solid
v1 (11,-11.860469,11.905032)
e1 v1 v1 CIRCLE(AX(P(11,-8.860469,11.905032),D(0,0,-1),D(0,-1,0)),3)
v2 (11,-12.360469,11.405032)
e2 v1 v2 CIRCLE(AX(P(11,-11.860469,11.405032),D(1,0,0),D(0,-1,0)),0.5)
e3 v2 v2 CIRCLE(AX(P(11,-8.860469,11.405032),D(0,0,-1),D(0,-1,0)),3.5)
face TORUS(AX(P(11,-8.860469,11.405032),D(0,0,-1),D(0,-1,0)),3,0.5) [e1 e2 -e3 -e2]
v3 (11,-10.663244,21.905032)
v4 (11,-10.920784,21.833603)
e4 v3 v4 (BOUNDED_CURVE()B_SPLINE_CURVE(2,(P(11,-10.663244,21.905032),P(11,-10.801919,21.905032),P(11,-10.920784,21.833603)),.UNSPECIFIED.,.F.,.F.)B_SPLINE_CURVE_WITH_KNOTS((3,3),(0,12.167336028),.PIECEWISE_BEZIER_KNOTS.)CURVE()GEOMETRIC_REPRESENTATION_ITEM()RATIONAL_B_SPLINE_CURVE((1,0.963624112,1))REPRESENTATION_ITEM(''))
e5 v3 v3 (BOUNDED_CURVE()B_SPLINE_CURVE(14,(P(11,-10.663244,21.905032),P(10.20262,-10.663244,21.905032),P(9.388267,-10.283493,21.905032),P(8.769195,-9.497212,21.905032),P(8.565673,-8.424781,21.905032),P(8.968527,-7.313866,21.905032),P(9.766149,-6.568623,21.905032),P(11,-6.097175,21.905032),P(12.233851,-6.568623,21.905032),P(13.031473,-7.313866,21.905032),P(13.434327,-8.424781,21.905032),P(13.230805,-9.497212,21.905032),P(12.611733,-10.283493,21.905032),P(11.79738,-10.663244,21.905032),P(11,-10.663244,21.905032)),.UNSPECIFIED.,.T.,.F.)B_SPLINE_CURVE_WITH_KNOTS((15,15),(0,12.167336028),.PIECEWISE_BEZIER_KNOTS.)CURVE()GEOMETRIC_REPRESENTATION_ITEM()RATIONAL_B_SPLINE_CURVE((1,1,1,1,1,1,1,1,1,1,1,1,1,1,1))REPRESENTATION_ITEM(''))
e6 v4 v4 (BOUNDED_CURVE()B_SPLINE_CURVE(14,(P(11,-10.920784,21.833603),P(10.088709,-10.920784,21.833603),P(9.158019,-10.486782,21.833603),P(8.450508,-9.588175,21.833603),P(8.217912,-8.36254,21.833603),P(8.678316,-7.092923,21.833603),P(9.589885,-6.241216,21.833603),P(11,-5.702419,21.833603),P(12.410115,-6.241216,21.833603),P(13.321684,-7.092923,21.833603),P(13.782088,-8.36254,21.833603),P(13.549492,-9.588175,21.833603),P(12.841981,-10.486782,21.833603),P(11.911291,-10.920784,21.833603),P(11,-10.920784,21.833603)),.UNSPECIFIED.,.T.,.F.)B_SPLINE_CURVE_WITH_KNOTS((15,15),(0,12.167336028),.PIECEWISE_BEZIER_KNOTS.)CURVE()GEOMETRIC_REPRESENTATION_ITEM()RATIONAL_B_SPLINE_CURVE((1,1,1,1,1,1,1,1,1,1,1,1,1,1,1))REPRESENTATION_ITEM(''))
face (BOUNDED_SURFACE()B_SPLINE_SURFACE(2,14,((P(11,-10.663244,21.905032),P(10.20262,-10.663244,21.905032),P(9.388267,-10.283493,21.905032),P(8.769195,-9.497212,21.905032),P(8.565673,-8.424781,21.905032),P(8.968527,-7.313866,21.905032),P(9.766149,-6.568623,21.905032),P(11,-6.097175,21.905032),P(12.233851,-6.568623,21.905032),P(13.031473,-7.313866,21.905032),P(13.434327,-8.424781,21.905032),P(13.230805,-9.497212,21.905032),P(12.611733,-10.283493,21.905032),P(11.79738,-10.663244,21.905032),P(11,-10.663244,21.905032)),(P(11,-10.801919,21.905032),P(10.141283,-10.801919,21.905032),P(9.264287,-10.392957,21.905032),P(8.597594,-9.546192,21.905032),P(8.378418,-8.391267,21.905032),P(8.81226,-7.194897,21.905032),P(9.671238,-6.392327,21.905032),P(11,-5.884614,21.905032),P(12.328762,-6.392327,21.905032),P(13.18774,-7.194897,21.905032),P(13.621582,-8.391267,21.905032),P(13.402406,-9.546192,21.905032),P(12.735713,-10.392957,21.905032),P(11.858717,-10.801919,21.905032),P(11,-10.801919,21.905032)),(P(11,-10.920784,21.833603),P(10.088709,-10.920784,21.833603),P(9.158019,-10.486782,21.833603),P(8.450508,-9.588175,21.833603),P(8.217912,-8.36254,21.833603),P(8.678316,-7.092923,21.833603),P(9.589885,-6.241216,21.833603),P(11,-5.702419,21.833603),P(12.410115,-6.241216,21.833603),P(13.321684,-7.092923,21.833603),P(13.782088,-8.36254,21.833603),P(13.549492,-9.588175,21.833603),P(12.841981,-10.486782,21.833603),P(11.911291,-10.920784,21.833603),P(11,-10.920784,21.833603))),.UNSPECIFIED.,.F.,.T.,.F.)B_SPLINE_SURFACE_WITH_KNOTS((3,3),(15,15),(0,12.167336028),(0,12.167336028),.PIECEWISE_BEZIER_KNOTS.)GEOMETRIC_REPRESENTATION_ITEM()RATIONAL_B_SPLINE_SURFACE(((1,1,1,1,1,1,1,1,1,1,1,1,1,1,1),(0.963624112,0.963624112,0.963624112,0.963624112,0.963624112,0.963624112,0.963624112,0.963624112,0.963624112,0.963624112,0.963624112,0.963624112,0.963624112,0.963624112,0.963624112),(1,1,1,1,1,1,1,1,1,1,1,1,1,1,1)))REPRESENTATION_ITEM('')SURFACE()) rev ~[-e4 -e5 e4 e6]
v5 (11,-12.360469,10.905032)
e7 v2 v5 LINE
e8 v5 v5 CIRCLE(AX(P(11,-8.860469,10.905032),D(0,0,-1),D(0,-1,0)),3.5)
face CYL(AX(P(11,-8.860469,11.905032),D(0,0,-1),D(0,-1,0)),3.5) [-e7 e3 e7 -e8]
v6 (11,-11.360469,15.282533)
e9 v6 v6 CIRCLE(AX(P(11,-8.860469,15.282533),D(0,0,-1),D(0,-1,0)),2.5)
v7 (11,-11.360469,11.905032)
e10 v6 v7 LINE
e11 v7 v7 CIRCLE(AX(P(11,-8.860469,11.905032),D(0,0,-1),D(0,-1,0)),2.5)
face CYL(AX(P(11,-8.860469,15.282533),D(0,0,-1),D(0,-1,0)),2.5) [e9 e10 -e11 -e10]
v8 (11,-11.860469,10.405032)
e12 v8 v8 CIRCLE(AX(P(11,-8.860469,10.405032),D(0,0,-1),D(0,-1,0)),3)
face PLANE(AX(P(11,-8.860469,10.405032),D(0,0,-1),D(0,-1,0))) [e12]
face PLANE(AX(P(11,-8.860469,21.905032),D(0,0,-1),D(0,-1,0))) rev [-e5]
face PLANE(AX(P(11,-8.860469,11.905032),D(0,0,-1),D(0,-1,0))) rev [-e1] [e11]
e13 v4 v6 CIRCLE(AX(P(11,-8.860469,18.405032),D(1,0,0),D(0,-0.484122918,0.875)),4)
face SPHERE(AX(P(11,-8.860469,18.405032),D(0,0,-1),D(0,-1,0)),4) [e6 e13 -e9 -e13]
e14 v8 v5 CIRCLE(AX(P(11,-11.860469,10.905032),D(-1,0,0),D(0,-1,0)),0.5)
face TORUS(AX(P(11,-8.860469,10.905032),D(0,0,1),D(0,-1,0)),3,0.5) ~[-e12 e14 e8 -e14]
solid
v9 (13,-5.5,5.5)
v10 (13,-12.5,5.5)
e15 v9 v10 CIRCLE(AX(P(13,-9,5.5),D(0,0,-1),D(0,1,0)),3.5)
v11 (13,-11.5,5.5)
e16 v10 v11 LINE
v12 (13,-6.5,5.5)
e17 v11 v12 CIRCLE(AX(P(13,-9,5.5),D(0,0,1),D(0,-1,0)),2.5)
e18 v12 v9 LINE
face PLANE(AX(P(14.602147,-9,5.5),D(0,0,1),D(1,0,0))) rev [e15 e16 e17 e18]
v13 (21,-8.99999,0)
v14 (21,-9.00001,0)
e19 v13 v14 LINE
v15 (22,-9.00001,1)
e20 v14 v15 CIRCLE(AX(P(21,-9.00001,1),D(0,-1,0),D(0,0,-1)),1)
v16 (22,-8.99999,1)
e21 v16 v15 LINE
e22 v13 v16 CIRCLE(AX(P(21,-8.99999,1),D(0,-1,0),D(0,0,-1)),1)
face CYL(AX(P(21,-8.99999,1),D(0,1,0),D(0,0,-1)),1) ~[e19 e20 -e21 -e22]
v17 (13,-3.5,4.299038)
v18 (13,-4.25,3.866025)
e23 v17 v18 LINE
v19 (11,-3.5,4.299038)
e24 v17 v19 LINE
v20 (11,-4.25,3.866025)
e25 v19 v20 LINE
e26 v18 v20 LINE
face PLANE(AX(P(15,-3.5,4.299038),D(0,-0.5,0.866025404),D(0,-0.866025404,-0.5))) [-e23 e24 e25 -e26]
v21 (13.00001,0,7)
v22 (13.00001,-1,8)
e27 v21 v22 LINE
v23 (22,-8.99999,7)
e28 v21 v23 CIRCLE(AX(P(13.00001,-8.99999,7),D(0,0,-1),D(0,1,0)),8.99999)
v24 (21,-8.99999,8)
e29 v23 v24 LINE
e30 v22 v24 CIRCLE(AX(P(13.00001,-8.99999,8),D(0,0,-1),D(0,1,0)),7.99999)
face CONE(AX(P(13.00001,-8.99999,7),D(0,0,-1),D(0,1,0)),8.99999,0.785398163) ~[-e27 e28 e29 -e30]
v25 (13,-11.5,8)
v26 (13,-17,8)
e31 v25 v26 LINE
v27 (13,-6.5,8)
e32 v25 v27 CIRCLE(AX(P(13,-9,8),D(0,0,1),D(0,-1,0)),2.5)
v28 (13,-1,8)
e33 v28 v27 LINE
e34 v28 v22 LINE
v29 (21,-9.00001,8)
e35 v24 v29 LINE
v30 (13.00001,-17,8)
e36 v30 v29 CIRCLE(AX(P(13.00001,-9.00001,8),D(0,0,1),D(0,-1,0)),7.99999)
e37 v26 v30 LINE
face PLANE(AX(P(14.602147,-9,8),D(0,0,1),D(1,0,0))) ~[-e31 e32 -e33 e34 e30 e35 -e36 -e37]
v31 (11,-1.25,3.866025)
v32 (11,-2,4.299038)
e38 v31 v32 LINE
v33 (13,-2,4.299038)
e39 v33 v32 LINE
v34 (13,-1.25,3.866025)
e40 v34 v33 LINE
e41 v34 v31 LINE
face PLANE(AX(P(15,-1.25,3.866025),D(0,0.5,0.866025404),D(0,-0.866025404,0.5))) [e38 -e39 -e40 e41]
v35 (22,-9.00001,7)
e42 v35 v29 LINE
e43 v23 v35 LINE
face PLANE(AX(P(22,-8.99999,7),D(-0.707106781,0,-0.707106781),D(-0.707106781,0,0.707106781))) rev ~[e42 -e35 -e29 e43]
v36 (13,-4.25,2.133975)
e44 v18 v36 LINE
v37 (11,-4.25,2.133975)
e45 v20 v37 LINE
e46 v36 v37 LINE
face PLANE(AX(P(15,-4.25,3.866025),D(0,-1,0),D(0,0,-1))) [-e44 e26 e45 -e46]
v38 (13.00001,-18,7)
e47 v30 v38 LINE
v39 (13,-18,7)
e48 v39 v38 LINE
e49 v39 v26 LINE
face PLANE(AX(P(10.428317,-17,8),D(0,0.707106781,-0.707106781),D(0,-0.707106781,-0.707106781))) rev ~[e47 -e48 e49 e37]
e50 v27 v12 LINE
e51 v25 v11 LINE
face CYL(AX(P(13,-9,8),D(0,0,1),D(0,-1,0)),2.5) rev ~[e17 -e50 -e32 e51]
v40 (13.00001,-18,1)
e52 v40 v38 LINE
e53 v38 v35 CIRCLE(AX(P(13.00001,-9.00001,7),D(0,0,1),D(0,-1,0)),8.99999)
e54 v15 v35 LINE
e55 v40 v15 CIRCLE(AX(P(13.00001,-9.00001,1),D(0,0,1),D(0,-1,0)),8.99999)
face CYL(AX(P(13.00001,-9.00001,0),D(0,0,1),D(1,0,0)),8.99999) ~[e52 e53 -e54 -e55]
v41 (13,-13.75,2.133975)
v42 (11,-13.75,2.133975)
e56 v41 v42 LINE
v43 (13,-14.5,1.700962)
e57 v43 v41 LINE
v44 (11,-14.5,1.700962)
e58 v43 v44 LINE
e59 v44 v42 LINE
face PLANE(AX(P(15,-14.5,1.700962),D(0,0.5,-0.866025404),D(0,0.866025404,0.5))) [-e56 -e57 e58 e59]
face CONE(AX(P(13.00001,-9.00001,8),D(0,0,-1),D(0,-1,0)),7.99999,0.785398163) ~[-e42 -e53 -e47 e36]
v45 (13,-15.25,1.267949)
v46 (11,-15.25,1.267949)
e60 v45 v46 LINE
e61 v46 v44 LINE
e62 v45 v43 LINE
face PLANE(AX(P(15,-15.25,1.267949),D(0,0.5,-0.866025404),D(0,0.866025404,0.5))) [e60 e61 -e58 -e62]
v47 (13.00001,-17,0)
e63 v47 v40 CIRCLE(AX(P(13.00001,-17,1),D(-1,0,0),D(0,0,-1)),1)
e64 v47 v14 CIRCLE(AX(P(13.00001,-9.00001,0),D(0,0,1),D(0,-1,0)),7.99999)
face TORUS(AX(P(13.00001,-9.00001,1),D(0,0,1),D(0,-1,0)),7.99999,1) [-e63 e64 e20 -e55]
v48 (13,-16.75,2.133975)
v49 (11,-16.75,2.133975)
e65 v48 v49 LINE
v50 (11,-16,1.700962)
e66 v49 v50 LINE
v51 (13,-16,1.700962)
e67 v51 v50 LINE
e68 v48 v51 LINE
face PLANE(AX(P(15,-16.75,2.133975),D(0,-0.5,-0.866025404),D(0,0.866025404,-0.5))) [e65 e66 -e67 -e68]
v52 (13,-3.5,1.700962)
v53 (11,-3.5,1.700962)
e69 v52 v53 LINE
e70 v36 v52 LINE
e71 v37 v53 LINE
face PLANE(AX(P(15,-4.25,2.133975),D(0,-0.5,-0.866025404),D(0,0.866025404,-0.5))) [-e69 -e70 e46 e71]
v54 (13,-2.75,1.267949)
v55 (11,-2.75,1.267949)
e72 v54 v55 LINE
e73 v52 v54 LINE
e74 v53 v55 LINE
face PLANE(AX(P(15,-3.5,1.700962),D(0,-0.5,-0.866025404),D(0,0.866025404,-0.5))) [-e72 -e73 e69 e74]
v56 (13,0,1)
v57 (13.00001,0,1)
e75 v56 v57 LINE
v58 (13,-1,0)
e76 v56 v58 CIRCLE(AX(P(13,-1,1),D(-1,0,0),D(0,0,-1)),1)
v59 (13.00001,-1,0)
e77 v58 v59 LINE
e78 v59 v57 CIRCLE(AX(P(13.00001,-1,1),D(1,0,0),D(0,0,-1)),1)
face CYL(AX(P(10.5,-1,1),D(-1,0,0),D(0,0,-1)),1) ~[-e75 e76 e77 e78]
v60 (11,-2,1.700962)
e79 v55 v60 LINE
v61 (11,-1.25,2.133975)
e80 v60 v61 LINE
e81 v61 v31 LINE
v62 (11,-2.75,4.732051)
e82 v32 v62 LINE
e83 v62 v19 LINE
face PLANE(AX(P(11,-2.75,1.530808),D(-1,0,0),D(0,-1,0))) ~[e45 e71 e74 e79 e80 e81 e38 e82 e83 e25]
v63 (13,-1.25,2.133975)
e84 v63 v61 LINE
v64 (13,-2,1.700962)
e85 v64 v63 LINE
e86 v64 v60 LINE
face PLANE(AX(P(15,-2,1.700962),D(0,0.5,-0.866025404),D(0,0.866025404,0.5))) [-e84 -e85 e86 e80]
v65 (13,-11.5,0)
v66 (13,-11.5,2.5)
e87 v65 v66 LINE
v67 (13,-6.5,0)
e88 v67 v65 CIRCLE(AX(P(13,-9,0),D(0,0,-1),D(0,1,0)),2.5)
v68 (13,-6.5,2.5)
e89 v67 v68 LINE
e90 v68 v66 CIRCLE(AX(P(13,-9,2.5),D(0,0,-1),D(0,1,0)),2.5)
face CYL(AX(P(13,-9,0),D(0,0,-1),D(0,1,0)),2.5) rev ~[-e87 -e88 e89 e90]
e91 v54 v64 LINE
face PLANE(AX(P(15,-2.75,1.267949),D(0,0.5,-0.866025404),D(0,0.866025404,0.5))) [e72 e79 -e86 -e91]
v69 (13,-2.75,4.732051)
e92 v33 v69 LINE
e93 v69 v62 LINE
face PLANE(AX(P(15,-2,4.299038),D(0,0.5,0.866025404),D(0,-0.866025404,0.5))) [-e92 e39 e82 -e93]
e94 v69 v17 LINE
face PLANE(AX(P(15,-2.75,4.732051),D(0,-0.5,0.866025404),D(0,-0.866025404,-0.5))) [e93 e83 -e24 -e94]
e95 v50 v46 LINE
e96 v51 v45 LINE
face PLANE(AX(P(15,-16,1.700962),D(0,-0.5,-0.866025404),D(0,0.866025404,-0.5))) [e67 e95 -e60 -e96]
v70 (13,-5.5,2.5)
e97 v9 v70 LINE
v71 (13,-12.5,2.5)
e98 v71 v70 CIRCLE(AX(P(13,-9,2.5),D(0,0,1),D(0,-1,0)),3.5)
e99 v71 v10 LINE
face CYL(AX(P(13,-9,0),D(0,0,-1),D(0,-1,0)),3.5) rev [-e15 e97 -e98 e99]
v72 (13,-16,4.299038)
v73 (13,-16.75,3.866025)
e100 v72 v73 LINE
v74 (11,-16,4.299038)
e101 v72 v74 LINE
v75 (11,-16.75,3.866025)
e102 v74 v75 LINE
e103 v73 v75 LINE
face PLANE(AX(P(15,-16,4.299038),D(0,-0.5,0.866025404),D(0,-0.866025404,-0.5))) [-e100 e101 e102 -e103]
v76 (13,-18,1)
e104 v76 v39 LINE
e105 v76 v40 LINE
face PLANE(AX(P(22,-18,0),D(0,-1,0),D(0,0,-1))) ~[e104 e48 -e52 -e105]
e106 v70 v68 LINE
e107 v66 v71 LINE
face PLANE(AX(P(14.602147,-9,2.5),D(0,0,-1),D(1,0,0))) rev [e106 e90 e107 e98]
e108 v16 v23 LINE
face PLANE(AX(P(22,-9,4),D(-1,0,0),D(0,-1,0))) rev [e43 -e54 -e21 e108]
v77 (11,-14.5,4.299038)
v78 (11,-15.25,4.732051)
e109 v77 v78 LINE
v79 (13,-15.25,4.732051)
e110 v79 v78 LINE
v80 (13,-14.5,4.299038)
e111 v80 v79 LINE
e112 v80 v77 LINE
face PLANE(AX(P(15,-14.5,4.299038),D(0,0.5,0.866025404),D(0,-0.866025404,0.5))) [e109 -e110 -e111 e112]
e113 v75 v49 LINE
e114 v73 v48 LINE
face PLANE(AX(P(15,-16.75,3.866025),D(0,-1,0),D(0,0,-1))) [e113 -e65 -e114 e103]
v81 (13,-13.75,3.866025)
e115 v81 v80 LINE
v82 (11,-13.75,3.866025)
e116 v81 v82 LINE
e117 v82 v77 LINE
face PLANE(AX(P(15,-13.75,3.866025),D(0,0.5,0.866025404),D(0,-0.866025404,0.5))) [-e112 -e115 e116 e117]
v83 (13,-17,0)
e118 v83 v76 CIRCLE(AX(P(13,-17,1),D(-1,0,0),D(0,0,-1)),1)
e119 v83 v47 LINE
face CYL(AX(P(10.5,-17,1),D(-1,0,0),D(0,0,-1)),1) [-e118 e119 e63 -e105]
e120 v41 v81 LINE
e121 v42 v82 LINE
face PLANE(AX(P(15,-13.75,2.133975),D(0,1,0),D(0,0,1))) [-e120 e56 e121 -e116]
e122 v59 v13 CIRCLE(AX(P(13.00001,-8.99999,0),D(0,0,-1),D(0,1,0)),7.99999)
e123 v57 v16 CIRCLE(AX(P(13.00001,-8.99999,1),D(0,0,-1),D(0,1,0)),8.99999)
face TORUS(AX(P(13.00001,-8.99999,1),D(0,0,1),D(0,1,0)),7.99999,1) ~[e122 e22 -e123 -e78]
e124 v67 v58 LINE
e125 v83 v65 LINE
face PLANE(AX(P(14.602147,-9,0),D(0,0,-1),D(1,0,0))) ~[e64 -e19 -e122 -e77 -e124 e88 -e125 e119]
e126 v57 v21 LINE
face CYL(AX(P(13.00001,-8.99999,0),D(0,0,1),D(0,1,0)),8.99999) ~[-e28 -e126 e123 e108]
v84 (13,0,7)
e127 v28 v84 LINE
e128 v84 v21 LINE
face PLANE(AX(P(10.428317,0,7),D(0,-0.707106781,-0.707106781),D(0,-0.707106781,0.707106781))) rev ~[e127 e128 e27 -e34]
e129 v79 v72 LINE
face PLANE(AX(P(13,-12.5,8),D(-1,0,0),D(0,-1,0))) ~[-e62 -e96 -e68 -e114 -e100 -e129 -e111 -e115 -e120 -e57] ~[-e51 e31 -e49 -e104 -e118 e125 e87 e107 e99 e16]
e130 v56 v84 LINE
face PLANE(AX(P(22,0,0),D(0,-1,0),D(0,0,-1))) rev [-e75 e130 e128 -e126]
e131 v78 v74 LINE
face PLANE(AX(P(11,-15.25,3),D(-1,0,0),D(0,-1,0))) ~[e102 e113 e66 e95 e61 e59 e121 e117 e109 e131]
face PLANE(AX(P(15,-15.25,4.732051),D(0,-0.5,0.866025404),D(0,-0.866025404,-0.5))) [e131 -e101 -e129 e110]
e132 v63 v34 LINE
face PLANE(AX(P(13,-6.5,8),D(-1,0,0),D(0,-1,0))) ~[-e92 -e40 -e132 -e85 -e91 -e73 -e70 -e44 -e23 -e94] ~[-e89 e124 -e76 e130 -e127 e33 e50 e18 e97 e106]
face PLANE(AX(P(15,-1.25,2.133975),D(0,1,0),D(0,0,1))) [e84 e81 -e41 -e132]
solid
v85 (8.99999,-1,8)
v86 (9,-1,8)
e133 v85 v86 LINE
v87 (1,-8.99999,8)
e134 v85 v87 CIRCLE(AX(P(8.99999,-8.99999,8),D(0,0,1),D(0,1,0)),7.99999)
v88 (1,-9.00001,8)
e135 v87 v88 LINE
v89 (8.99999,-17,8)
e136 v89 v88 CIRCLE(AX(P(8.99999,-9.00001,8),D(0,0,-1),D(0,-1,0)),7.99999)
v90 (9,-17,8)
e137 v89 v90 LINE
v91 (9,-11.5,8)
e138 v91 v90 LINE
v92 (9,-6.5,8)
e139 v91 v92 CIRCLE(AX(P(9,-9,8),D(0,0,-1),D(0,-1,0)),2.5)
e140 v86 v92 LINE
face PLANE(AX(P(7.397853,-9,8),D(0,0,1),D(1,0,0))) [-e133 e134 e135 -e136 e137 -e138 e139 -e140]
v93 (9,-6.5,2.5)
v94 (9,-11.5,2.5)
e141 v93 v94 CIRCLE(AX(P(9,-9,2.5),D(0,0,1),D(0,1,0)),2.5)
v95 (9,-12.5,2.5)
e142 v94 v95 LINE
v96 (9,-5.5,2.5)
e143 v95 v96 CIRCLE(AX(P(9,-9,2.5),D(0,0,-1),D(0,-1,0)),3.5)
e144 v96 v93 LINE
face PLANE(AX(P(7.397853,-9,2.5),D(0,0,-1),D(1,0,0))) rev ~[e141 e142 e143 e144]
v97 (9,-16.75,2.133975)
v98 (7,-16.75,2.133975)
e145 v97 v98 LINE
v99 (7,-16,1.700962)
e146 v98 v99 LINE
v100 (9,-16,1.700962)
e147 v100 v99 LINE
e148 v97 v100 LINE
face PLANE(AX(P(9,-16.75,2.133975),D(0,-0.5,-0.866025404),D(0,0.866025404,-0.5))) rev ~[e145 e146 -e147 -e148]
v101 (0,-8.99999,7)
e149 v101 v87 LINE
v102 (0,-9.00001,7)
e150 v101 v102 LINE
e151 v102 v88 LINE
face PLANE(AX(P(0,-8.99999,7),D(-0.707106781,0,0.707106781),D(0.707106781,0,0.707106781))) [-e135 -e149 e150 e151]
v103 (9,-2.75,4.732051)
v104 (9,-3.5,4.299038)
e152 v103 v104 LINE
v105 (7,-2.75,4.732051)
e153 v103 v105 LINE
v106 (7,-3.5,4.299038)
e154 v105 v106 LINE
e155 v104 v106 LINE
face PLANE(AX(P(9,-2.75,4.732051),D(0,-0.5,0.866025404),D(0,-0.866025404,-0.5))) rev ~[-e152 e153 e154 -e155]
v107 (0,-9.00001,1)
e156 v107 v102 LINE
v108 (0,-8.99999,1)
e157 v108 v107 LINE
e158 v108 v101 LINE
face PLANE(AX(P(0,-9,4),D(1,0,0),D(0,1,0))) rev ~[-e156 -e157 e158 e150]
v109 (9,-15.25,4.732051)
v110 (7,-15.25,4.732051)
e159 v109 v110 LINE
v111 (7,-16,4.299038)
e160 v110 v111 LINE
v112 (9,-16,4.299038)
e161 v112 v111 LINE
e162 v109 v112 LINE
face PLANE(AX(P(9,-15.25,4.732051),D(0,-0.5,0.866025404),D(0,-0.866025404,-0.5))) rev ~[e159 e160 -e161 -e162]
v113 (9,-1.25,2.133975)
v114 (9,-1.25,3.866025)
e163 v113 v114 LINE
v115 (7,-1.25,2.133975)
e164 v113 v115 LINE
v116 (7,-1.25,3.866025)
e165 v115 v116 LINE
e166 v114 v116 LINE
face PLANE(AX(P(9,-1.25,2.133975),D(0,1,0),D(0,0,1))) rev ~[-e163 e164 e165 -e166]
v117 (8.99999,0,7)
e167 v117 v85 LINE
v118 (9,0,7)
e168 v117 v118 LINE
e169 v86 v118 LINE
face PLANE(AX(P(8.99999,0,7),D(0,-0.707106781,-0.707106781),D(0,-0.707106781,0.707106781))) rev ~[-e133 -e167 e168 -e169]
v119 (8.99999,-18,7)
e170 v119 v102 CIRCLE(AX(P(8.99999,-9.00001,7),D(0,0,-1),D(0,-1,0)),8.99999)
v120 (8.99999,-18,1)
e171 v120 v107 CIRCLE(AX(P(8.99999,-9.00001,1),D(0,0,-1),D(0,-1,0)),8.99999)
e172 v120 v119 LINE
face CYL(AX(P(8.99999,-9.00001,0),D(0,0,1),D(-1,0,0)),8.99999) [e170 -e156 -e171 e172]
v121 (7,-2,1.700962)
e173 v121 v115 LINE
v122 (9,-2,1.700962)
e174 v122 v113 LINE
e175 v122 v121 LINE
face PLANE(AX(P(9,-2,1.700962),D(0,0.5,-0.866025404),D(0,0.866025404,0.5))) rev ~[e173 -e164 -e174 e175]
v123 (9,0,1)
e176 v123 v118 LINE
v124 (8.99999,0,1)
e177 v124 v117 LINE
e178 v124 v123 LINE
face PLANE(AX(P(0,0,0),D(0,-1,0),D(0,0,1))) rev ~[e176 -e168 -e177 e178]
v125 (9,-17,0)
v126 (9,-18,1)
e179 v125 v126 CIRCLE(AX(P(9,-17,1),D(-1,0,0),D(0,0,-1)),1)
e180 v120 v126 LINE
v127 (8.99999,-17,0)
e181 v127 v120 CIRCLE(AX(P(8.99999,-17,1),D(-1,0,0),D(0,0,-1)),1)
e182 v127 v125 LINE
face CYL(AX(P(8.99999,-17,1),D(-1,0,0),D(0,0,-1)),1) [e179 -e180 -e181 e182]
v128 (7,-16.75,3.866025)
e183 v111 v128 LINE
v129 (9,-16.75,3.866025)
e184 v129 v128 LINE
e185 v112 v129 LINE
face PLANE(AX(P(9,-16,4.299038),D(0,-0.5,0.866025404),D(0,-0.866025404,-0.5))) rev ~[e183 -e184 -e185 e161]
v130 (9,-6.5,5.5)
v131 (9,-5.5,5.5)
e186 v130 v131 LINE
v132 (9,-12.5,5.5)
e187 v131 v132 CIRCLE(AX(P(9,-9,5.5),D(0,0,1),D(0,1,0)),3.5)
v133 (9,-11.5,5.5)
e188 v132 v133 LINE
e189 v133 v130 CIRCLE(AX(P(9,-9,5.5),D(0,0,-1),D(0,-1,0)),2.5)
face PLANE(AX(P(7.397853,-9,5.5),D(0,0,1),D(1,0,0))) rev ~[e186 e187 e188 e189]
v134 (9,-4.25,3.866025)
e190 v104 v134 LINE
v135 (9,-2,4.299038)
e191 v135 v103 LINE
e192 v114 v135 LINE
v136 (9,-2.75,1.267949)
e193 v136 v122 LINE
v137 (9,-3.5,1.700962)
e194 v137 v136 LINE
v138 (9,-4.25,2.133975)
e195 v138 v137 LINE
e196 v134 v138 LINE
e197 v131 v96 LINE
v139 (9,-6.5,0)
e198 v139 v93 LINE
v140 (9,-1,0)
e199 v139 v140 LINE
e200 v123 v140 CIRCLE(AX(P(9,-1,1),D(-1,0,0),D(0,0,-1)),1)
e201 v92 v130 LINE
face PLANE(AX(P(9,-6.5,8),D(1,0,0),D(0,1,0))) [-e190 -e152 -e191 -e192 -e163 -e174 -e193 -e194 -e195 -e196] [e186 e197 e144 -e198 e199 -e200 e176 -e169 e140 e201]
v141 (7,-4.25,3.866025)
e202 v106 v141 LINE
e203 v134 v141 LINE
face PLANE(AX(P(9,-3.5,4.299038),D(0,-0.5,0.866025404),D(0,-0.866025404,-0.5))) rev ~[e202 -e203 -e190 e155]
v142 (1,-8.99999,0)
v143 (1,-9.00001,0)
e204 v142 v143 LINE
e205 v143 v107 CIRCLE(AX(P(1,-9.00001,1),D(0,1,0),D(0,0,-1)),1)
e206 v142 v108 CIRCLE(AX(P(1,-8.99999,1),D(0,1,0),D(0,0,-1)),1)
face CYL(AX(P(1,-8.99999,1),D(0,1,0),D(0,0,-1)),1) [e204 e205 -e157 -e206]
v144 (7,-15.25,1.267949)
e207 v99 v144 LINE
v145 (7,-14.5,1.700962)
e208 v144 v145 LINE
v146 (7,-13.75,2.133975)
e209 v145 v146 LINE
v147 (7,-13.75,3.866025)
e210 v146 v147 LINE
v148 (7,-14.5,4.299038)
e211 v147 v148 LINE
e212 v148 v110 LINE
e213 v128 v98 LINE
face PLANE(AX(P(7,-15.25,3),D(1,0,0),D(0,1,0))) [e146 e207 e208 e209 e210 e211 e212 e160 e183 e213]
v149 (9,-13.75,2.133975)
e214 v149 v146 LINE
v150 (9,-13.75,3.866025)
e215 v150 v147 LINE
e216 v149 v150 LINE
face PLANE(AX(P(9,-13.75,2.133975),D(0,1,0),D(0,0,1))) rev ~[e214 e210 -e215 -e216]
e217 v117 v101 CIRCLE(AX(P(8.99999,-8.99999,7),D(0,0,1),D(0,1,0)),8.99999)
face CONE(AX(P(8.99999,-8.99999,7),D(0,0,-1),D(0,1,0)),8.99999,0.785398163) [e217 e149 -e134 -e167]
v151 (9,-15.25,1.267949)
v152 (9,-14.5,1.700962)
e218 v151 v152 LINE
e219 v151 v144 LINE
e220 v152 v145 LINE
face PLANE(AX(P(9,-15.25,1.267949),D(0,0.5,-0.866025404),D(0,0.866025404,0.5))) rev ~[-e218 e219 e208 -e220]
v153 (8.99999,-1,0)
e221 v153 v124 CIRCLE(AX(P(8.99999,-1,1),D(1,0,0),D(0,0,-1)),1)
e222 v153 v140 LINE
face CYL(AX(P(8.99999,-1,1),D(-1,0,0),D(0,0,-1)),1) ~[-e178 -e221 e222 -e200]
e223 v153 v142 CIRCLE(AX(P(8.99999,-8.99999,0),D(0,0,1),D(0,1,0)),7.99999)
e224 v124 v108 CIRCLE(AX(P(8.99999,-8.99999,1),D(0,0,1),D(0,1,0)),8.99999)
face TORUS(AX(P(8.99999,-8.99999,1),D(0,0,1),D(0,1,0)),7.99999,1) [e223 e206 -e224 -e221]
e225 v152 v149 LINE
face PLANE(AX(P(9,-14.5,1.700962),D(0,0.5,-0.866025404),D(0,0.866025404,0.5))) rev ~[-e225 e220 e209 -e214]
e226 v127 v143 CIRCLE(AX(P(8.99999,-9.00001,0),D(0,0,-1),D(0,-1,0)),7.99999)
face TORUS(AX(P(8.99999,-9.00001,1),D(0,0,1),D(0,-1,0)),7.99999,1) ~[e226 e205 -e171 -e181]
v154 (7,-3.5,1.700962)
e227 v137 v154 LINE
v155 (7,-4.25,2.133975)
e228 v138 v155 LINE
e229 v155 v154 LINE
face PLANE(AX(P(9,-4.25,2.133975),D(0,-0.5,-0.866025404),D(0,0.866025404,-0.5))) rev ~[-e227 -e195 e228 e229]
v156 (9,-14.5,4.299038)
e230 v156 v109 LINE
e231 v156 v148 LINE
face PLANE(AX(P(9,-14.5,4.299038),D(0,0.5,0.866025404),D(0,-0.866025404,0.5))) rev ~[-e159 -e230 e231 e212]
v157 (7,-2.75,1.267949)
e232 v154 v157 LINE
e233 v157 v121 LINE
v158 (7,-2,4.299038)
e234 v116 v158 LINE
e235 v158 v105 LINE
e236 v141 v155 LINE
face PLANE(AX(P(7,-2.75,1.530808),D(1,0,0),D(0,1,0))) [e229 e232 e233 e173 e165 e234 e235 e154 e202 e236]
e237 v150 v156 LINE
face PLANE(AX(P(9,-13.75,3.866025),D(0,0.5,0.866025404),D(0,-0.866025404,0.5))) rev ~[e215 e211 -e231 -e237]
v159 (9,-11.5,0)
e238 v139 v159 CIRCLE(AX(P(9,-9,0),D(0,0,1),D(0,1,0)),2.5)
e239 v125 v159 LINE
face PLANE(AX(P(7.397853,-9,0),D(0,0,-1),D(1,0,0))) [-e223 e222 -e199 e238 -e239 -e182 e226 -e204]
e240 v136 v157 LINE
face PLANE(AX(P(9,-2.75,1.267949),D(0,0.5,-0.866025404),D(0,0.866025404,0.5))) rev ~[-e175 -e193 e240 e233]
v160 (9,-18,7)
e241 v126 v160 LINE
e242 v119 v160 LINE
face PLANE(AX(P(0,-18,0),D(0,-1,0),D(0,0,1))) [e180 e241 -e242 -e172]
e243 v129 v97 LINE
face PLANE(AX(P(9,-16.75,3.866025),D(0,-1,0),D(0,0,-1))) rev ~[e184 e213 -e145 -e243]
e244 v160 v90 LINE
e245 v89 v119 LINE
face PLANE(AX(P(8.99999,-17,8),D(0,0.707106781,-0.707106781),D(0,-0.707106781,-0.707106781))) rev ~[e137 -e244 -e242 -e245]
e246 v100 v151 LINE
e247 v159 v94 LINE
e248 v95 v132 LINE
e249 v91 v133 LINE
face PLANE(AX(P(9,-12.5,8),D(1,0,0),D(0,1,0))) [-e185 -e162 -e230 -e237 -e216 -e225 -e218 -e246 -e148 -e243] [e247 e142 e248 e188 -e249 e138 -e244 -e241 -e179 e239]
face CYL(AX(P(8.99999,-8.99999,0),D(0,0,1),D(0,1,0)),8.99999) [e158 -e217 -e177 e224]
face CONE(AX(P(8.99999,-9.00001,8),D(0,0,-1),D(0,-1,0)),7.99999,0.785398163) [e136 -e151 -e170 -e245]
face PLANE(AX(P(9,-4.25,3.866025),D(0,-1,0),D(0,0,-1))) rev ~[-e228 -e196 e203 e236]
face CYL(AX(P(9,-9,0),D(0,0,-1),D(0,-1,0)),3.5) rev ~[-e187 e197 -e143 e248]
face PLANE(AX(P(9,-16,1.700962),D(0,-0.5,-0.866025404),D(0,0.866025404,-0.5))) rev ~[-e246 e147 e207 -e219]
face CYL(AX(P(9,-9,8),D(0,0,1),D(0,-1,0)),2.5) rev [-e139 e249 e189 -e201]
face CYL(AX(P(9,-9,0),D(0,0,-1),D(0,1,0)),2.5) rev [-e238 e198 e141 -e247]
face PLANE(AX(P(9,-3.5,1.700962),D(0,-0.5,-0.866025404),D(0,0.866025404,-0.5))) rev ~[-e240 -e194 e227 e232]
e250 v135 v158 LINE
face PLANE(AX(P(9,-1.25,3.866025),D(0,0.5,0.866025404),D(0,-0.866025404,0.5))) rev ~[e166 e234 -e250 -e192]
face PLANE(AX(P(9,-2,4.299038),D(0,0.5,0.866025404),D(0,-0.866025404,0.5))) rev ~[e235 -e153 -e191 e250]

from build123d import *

# Parameters (mm, degrees)
F0_W           = 18
F0_H           = 8
F1_DEPTH       = 9
F3_DEPTH       = 4
F4_DEPTH       = 2.5
F6_R           = 8.99999
F8_DEPTH       = 2
F10_DEPTH      = 4
F11_DEPTH      = 2.5
F15_R          = 0.5
F17_DEPTH      = 4
F18_T1_DEPTH   = 2.50001
F18_T3_DEPTH   = 2e-05
F18_T6_ANGLE   = 90
F18_T8_ANGLE   = 90
F18_2_T1_DEPTH = 2.50001
F18_2_T3_DEPTH = 2e-05
F18_2_T6_ANGLE = 90
F18_2_T8_ANGLE = 90
F19_T1_DEPTH   = 2.571692988
F19_T3_DEPTH   = 2e-05
F19_T6_ANGLE   = 90
F19_T8_ANGLE   = 90
F19_2_T1_DEPTH = 2.571692988
F19_2_T3_DEPTH = 2e-05
F19_2_T6_ANGLE = 90
F19_2_T8_ANGLE = 90


# Not quite as in the source:
# - a fillet or chamfer that OpenCascade refuses, or shapes differently, is made with other operations: its cross-section is extruded or revolved along the edge and cut away or added
# - a fillet or chamfer is up to 0.001 mm smaller than in the source, because OpenCascade refuses the exact size


with BuildPart() as f1:
    # F0 (on Right) → F1 (new body)
    with BuildSketch(Plane.YZ):
        with Locations((-9, 4)):
            Rectangle(F0_W, F0_H)
    extrude(amount=F1_DEPTH)

    # F2 (on face) → F3 (cut)
    with BuildSketch(Plane(origin=(0, 0, 0), x_dir=(1, 0, 0), z_dir=(0, 0, -1))):
        with BuildLine():
            Line((9, 6.5), (9, 11.5))
            ThreePointArc((9, 11.5), (6.5, 9), (9, 6.5))
        make_face()
        with BuildLine():
            ThreePointArc((9, 6.5), (6.5, 9), (9, 11.5))
            Line((9, 11.5), (9, 12.5))
            ThreePointArc((9, 12.5), (5.5, 9), (9, 5.5))
            Line((9, 5.5), (9, 6.5))
        make_face()
    extrude(amount=-F3_DEPTH, mode=Mode.SUBTRACT)

    # F2 (on face) → F4 (join)
    with BuildSketch(Plane(origin=(0, 0, 0), x_dir=(1, 0, 0), z_dir=(0, 0, -1))):
        with BuildLine():
            ThreePointArc((9, 6.5), (6.5, 9), (9, 11.5))
            Line((9, 11.5), (9, 12.5))
            ThreePointArc((9, 12.5), (5.5, 9), (9, 5.5))
            Line((9, 5.5), (9, 6.5))
        make_face()
    extrude(amount=-F4_DEPTH)

    # F6 (radius 9 in the source; OpenCascade refuses exactly that, so slightly less here)
    f6_edges = [f1.edges().sort_by_distance(p)[0] for p in [
        (0, -18, 4),
        (0, 0, 4),
    ]]
    fillet(f6_edges, radius=F6_R)

    # F7 (on face) → F8 (cut)
    with BuildSketch(Plane.YZ.offset(9)):
        with BuildLine():
            ThreePointArc((-14.5000000001, 1.7009618943), (-13.9509618944, 2.2499999999), (-13.75, 3))
            ThreePointArc((-13.75, 3), (-13.9509618878, 3.7499999887), (-14.4999999775, 4.2990380927))
            ThreePointArc((-14.4999999775, 4.2990380927), (-15.2499999828, 4.5), (-15.9999999928, 4.2990381098))
            ThreePointArc((-15.9999999928, 4.2990381098), (-16.5490381036, 3.7500000036), (-16.75, 3))
            ThreePointArc((-16.75, 3), (-16.5490381076, 2.2500000033), (-16.0000000065, 1.7009618981))
            ThreePointArc((-16.0000000065, 1.7009618981), (-15.2500000038, 1.5), (-14.5000000001, 1.7009618943))
        make_face()
        with BuildLine():
            Line((-13.75, 2.1339745962), (-13.75, 3))
            ThreePointArc((-13.75, 3), (-13.9509618944, 2.2499999999), (-14.5000000001, 1.7009618943))
            Line((-14.5000000001, 1.7009618943), (-13.75, 2.1339745962))
        make_face()
        with BuildLine():
            ThreePointArc((-14.4999999775, 4.2990380927), (-13.9509618878, 3.7499999887), (-13.75, 3))
            Line((-13.75, 3), (-13.75, 3.8660254038))
            Line((-13.75, 3.8660254038), (-14.4999999775, 4.2990380927))
        make_face()
        with BuildLine():
            ThreePointArc((-15.9999999928, 4.2990381098), (-15.2499999828, 4.5), (-14.4999999775, 4.2990380927))
            Line((-14.4999999775, 4.2990380927), (-15.25, 4.7320508076))
            Line((-15.25, 4.7320508076), (-15.9999999928, 4.2990381098))
        make_face()
        with BuildLine():
            Line((-15.25, 1.2679491924), (-14.5000000001, 1.7009618943))
            ThreePointArc((-14.5000000001, 1.7009618943), (-15.2500000038, 1.5), (-16.0000000065, 1.7009618981))
            Line((-16.0000000065, 1.7009618981), (-15.25, 1.2679491924))
        make_face()
        with BuildLine():
            ThreePointArc((-16.75, 3), (-16.5490381036, 3.7500000036), (-15.9999999928, 4.2990381098))
            Line((-15.9999999928, 4.2990381098), (-16.75, 3.8660254038))
            Line((-16.75, 3.8660254038), (-16.75, 3))
        make_face()
        with BuildLine():
            Line((-16.75, 2.1339745962), (-16.0000000065, 1.7009618981))
            ThreePointArc((-16.0000000065, 1.7009618981), (-16.5490381076, 2.2500000033), (-16.75, 3))
            Line((-16.75, 3), (-16.75, 2.1339745962))
        make_face()
        with BuildLine():
            Line((-3.5000000108, 1.7009619005), (-2.75, 1.2679491924))
            Line((-2.75, 1.2679491924), (-1.9999999902, 1.7009619))
            ThreePointArc((-1.9999999902, 1.7009619), (-2.7500000006, 1.5), (-3.5000000108, 1.7009619005))
        make_face()
        with BuildLine():
            ThreePointArc((-1.25, 3), (-1.4509618915, 2.2500000049), (-1.9999999902, 1.7009619))
            Line((-1.9999999902, 1.7009619), (-1.25, 2.1339745962))
            Line((-1.25, 2.1339745962), (-1.25, 3))
        make_face()
        with BuildLine():
            ThreePointArc((-3.5000000108, 1.7009619005), (-2.7500000006, 1.5), (-1.9999999902, 1.7009619))
            ThreePointArc((-1.9999999902, 1.7009619), (-1.4509618915, 2.2500000049), (-1.25, 3))
            ThreePointArc((-1.25, 3), (-1.4509618964, 3.7500000036), (-2.0000000072, 4.2990381098))
            ThreePointArc((-2.0000000072, 4.2990381098), (-2.749999993, 4.5), (-3.4999999807, 4.2990381168))
            ThreePointArc((-3.4999999807, 4.2990381168), (-4.0490381001, 3.7500000097), (-4.25, 3))
            ThreePointArc((-4.25, 3), (-4.0490381088, 2.2500000054), (-3.5000000108, 1.7009619005))
        make_face()
        with BuildLine():
            Line((-4.25, 2.1339745962), (-3.5000000108, 1.7009619005))
            ThreePointArc((-3.5000000108, 1.7009619005), (-4.0490381088, 2.2500000054), (-4.25, 3))
            Line((-4.25, 3), (-4.25, 2.1339745962))
        make_face()
        with BuildLine():
            ThreePointArc((-2.0000000072, 4.2990381098), (-1.4509618964, 3.7500000036), (-1.25, 3))
            Line((-1.25, 3), (-1.25, 3.8660254038))
            Line((-1.25, 3.8660254038), (-2.0000000072, 4.2990381098))
        make_face()
        with BuildLine():
            Line((-4.25, 3.8660254038), (-4.25, 3))
            ThreePointArc((-4.25, 3), (-4.0490381001, 3.7500000097), (-3.4999999807, 4.2990381168))
            Line((-3.4999999807, 4.2990381168), (-4.25, 3.8660254038))
        make_face()
        with BuildLine():
            ThreePointArc((-3.4999999807, 4.2990381168), (-2.749999993, 4.5), (-2.0000000072, 4.2990381098))
            Line((-2.0000000072, 4.2990381098), (-2.75, 4.7320508076))
            Line((-2.75, 4.7320508076), (-3.4999999807, 4.2990381168))
        make_face()
    extrude(amount=-F8_DEPTH, mode=Mode.SUBTRACT)

    # F9 (on face) → F10 (cut)
    with BuildSketch(Plane.XY.offset(8)):
        with BuildLine():
            Line((9, -11.5), (9, -6.5))
            ThreePointArc((9, -6.5), (6.5, -9), (9, -11.5))
        make_face()
        with BuildLine():
            ThreePointArc((9, -11.5), (6.5, -9), (9, -6.5))
            Line((9, -6.5), (9, -5.5))
            ThreePointArc((9, -5.5), (5.5, -9), (9, -12.5))
            Line((9, -12.5), (9, -11.5))
        make_face()
    extrude(amount=-F10_DEPTH, mode=Mode.SUBTRACT)

    # F9 (on face) → F11 (join)
    with BuildSketch(Plane.XY.offset(8)):
        with BuildLine():
            ThreePointArc((9, -11.5), (6.5, -9), (9, -6.5))
            Line((9, -6.5), (9, -5.5))
            ThreePointArc((9, -5.5), (5.5, -9), (9, -12.5))
            Line((9, -12.5), (9, -11.5))
        make_face()
    extrude(amount=-F11_DEPTH)


with BuildPart() as f14:
    # F13 (on offset) → F14 (revolve)
    with BuildSketch(Plane.YZ.offset(11)):
        with BuildLine():
            Line((-12.3604685068, 10.4050319642), (-8.8604685068, 10.4050319642))
            Line((-8.8604685068, 10.4050319642), (-8.8604685068, 21.9050319642))
            Line((-8.8604685068, 21.9050319642), (-10.7969601799, 21.9050319642))
            ThreePointArc((-10.7969601799, 21.9050319642), (-12.846066058, 18.7441663918), (-11.3604685068, 15.282532965))
            Line((-11.3604685068, 15.282532965), (-11.3604685068, 14.4050319642))
            Line((-11.3604685068, 14.4050319642), (-11.3604685068, 11.9050319642))
            Line((-11.3604685068, 11.9050319642), (-12.3604685068, 11.9050319642))
            Line((-12.3604685068, 11.9050319642), (-12.3604685068, 10.4050319642))
        make_face()
    revolve(axis=Axis((11, -8.8604685068, 16.1550319642), (0, 0, -1)))

    # F15
    f15_edges = [f14.edges().sort_by_distance(p)[0] for p in [
        (11, -5.360469, 11.905032),
        (11, -5.360469, 10.405032),
        (11, -12.360469, 11.155032),
        (11, -6.923977, 21.905032),
    ]]
    fillet(f15_edges, radius=F15_R)


with BuildPart() as f16_1:
    # F16: instance of F1
    add(f1.part.mirror(Plane.YZ.offset(11)))

    # F17 (add): faces of the model
    f17_faces = [f16_1.faces().sort_by_distance(p)[0] for p in [
        (15, -15.25, 3),
        (15, -2.75, 3),
    ]]
    extrude(f17_faces, amount=F17_DEPTH)

    # F18#2: fillet of radius 1 on 1 edges, made by hand

    # F18_2_s2 → F18_2_t1 (cut)
    with BuildSketch(Plane.YZ.offset(10.5)):
        with BuildLine():
            ThreePointArc((-1, 0), (-0.2928932188, 0.2928932188), (0, 1))
            Line((0, 1), (0, 0))
            Line((0, 0), (-1, 0))
        make_face()
        with BuildLine():
            ThreePointArc((-17, 0), (-17.7071067812, 0.2928932188), (-18, 1))
            Line((-18, 1), (-18, 0))
            Line((-18, 0), (-17, 0))
        make_face()
    extrude(amount=F18_2_T1_DEPTH, mode=Mode.SUBTRACT)

    # F18_2_s4 → F18_2_t3 (cut)
    with BuildSketch(Plane.XZ.offset(8.99999)):
        with BuildLine():
            ThreePointArc((21, 0), (21.7071067812, 0.2928932188), (22, 1))
            Line((22, 1), (22, 0))
            Line((22, 0), (21, 0))
        make_face()
    extrude(amount=F18_2_T3_DEPTH, mode=Mode.SUBTRACT)

    # F18_2_s5 → F18_2_t6 (revolve, cut)
    with BuildSketch(Plane.YZ.offset(13.00001)):
        with BuildLine():
            ThreePointArc((-1, 0), (-0.2928932188, 0.2928932188), (0, 1))
            Line((0, 1), (0, 0))
            Line((0, 0), (-1, 0))
        make_face()
    revolve(axis=Axis((13.00001, -8.99999, 0), (0, 0, -1)), revolution_arc=F18_2_T6_ANGLE, mode=Mode.SUBTRACT)

    # F18_2_s7 → F18_2_t8 (revolve, cut)
    with BuildSketch(Plane.YZ.offset(13.00001)):
        with BuildLine():
            ThreePointArc((-17, 0), (-17.7071067812, 0.2928932188), (-18, 1))
            Line((-18, 1), (-18, 0))
            Line((-18, 0), (-17, 0))
        make_face()
    revolve(axis=Axis((13.00001, -9.00001, 0), (0, 0, 1)), revolution_arc=F18_2_T8_ANGLE, mode=Mode.SUBTRACT)

    # F19#2: chamfer of 1 on 1 edges, made by hand

    # F19_2_s2 → F19_2_t1 (cut)
    with BuildSketch(Plane.YZ.offset(10.428317012)):
        Polygon((0, 7), (-1, 8), (0, 8), align=None)
        Polygon((-17, 8), (-18, 7), (-18, 8), align=None)
    extrude(amount=F19_2_T1_DEPTH, mode=Mode.SUBTRACT)

    # F19_2_s4 → F19_2_t3 (cut)
    with BuildSketch(Plane.XZ.offset(8.99999)):
        Polygon((22, 7), (21, 8), (22, 8), align=None)
    extrude(amount=F19_2_T3_DEPTH, mode=Mode.SUBTRACT)

    # F19_2_s5 → F19_2_t6 (revolve, cut)
    with BuildSketch(Plane.YZ.offset(13.00001)):
        Polygon((0, 7), (-1, 8), (0, 8), align=None)
    revolve(axis=Axis((13.00001, -8.99999, 8), (0, 0, -1)), revolution_arc=F19_2_T6_ANGLE, mode=Mode.SUBTRACT)

    # F19_2_s7 → F19_2_t8 (revolve, cut)
    with BuildSketch(Plane.YZ.offset(13.00001)):
        Polygon((-17, 8), (-18, 7), (-18, 8), align=None)
    revolve(axis=Axis((13.00001, -9.00001, 8), (0, 0, 1)), revolution_arc=F19_2_T8_ANGLE, mode=Mode.SUBTRACT)


with BuildPart() as f1_1:
    add(f1.part)

    # F18: fillet of radius 1 on 1 edges, made by hand

    # F18_s2 → F18_t1 (cut)
    with BuildSketch(Plane.YZ.offset(8.99999)):
        with BuildLine():
            ThreePointArc((-1, 0), (-0.2928932188, 0.2928932188), (0, 1))
            Line((0, 1), (0, 0))
            Line((0, 0), (-1, 0))
        make_face()
        with BuildLine():
            ThreePointArc((-17, 0), (-17.7071067812, 0.2928932188), (-18, 1))
            Line((-18, 1), (-18, 0))
            Line((-18, 0), (-17, 0))
        make_face()
    extrude(amount=F18_T1_DEPTH, mode=Mode.SUBTRACT)

    # F18_s4 → F18_t3 (cut)
    with BuildSketch(Plane.XZ.offset(8.99999)):
        with BuildLine():
            ThreePointArc((1, 0), (0.2928932188, 0.2928932188), (0, 1))
            Line((0, 1), (0, 0))
            Line((0, 0), (1, 0))
        make_face()
    extrude(amount=F18_T3_DEPTH, mode=Mode.SUBTRACT)

    # F18_s5 → F18_t6 (revolve, cut)
    with BuildSketch(Plane.YZ.offset(8.99999)):
        with BuildLine():
            ThreePointArc((-1, 0), (-0.2928932188, 0.2928932188), (0, 1))
            Line((0, 1), (0, 0))
            Line((0, 0), (-1, 0))
        make_face()
    revolve(axis=Axis((8.99999, -8.99999, 0), (0, 0, 1)), revolution_arc=F18_T6_ANGLE, mode=Mode.SUBTRACT)

    # F18_s7 → F18_t8 (revolve, cut)
    with BuildSketch(Plane.YZ.offset(8.99999)):
        with BuildLine():
            ThreePointArc((-17, 0), (-17.7071067812, 0.2928932188), (-18, 1))
            Line((-18, 1), (-18, 0))
            Line((-18, 0), (-17, 0))
        make_face()
    revolve(axis=Axis((8.99999, -9.00001, 0), (0, 0, -1)), revolution_arc=F18_T8_ANGLE, mode=Mode.SUBTRACT)

    # F19: chamfer of 1 on 1 edges, made by hand

    # F19_s2 → F19_t1 (cut)
    with BuildSketch(Plane.YZ.offset(8.99999)):
        Polygon((0, 7), (-1, 8), (0, 8), align=None)
        Polygon((-17, 8), (-18, 7), (-18, 8), align=None)
    extrude(amount=F19_T1_DEPTH, mode=Mode.SUBTRACT)

    # F19_s4 → F19_t3 (cut)
    with BuildSketch(Plane.XZ.offset(8.99999)):
        Polygon((0, 7), (1, 8), (0, 8), align=None)
    extrude(amount=F19_T3_DEPTH, mode=Mode.SUBTRACT)

    # F19_s5 → F19_t6 (revolve, cut)
    with BuildSketch(Plane.YZ.offset(8.99999)):
        Polygon((0, 7), (-1, 8), (0, 8), align=None)
    revolve(axis=Axis((8.99999, -8.99999, 8), (0, 0, 1)), revolution_arc=F19_T6_ANGLE, mode=Mode.SUBTRACT)

    # F19_s7 → F19_t8 (revolve, cut)
    with BuildSketch(Plane.YZ.offset(8.99999)):
        Polygon((-17, 8), (-18, 7), (-18, 8), align=None)
    revolve(axis=Axis((8.99999, -9.00001, 8), (0, 0, -1)), revolution_arc=F19_T8_ANGLE, mode=Mode.SUBTRACT)


solid = Compound([f14.part, f16_1.part, f1_1.part])
